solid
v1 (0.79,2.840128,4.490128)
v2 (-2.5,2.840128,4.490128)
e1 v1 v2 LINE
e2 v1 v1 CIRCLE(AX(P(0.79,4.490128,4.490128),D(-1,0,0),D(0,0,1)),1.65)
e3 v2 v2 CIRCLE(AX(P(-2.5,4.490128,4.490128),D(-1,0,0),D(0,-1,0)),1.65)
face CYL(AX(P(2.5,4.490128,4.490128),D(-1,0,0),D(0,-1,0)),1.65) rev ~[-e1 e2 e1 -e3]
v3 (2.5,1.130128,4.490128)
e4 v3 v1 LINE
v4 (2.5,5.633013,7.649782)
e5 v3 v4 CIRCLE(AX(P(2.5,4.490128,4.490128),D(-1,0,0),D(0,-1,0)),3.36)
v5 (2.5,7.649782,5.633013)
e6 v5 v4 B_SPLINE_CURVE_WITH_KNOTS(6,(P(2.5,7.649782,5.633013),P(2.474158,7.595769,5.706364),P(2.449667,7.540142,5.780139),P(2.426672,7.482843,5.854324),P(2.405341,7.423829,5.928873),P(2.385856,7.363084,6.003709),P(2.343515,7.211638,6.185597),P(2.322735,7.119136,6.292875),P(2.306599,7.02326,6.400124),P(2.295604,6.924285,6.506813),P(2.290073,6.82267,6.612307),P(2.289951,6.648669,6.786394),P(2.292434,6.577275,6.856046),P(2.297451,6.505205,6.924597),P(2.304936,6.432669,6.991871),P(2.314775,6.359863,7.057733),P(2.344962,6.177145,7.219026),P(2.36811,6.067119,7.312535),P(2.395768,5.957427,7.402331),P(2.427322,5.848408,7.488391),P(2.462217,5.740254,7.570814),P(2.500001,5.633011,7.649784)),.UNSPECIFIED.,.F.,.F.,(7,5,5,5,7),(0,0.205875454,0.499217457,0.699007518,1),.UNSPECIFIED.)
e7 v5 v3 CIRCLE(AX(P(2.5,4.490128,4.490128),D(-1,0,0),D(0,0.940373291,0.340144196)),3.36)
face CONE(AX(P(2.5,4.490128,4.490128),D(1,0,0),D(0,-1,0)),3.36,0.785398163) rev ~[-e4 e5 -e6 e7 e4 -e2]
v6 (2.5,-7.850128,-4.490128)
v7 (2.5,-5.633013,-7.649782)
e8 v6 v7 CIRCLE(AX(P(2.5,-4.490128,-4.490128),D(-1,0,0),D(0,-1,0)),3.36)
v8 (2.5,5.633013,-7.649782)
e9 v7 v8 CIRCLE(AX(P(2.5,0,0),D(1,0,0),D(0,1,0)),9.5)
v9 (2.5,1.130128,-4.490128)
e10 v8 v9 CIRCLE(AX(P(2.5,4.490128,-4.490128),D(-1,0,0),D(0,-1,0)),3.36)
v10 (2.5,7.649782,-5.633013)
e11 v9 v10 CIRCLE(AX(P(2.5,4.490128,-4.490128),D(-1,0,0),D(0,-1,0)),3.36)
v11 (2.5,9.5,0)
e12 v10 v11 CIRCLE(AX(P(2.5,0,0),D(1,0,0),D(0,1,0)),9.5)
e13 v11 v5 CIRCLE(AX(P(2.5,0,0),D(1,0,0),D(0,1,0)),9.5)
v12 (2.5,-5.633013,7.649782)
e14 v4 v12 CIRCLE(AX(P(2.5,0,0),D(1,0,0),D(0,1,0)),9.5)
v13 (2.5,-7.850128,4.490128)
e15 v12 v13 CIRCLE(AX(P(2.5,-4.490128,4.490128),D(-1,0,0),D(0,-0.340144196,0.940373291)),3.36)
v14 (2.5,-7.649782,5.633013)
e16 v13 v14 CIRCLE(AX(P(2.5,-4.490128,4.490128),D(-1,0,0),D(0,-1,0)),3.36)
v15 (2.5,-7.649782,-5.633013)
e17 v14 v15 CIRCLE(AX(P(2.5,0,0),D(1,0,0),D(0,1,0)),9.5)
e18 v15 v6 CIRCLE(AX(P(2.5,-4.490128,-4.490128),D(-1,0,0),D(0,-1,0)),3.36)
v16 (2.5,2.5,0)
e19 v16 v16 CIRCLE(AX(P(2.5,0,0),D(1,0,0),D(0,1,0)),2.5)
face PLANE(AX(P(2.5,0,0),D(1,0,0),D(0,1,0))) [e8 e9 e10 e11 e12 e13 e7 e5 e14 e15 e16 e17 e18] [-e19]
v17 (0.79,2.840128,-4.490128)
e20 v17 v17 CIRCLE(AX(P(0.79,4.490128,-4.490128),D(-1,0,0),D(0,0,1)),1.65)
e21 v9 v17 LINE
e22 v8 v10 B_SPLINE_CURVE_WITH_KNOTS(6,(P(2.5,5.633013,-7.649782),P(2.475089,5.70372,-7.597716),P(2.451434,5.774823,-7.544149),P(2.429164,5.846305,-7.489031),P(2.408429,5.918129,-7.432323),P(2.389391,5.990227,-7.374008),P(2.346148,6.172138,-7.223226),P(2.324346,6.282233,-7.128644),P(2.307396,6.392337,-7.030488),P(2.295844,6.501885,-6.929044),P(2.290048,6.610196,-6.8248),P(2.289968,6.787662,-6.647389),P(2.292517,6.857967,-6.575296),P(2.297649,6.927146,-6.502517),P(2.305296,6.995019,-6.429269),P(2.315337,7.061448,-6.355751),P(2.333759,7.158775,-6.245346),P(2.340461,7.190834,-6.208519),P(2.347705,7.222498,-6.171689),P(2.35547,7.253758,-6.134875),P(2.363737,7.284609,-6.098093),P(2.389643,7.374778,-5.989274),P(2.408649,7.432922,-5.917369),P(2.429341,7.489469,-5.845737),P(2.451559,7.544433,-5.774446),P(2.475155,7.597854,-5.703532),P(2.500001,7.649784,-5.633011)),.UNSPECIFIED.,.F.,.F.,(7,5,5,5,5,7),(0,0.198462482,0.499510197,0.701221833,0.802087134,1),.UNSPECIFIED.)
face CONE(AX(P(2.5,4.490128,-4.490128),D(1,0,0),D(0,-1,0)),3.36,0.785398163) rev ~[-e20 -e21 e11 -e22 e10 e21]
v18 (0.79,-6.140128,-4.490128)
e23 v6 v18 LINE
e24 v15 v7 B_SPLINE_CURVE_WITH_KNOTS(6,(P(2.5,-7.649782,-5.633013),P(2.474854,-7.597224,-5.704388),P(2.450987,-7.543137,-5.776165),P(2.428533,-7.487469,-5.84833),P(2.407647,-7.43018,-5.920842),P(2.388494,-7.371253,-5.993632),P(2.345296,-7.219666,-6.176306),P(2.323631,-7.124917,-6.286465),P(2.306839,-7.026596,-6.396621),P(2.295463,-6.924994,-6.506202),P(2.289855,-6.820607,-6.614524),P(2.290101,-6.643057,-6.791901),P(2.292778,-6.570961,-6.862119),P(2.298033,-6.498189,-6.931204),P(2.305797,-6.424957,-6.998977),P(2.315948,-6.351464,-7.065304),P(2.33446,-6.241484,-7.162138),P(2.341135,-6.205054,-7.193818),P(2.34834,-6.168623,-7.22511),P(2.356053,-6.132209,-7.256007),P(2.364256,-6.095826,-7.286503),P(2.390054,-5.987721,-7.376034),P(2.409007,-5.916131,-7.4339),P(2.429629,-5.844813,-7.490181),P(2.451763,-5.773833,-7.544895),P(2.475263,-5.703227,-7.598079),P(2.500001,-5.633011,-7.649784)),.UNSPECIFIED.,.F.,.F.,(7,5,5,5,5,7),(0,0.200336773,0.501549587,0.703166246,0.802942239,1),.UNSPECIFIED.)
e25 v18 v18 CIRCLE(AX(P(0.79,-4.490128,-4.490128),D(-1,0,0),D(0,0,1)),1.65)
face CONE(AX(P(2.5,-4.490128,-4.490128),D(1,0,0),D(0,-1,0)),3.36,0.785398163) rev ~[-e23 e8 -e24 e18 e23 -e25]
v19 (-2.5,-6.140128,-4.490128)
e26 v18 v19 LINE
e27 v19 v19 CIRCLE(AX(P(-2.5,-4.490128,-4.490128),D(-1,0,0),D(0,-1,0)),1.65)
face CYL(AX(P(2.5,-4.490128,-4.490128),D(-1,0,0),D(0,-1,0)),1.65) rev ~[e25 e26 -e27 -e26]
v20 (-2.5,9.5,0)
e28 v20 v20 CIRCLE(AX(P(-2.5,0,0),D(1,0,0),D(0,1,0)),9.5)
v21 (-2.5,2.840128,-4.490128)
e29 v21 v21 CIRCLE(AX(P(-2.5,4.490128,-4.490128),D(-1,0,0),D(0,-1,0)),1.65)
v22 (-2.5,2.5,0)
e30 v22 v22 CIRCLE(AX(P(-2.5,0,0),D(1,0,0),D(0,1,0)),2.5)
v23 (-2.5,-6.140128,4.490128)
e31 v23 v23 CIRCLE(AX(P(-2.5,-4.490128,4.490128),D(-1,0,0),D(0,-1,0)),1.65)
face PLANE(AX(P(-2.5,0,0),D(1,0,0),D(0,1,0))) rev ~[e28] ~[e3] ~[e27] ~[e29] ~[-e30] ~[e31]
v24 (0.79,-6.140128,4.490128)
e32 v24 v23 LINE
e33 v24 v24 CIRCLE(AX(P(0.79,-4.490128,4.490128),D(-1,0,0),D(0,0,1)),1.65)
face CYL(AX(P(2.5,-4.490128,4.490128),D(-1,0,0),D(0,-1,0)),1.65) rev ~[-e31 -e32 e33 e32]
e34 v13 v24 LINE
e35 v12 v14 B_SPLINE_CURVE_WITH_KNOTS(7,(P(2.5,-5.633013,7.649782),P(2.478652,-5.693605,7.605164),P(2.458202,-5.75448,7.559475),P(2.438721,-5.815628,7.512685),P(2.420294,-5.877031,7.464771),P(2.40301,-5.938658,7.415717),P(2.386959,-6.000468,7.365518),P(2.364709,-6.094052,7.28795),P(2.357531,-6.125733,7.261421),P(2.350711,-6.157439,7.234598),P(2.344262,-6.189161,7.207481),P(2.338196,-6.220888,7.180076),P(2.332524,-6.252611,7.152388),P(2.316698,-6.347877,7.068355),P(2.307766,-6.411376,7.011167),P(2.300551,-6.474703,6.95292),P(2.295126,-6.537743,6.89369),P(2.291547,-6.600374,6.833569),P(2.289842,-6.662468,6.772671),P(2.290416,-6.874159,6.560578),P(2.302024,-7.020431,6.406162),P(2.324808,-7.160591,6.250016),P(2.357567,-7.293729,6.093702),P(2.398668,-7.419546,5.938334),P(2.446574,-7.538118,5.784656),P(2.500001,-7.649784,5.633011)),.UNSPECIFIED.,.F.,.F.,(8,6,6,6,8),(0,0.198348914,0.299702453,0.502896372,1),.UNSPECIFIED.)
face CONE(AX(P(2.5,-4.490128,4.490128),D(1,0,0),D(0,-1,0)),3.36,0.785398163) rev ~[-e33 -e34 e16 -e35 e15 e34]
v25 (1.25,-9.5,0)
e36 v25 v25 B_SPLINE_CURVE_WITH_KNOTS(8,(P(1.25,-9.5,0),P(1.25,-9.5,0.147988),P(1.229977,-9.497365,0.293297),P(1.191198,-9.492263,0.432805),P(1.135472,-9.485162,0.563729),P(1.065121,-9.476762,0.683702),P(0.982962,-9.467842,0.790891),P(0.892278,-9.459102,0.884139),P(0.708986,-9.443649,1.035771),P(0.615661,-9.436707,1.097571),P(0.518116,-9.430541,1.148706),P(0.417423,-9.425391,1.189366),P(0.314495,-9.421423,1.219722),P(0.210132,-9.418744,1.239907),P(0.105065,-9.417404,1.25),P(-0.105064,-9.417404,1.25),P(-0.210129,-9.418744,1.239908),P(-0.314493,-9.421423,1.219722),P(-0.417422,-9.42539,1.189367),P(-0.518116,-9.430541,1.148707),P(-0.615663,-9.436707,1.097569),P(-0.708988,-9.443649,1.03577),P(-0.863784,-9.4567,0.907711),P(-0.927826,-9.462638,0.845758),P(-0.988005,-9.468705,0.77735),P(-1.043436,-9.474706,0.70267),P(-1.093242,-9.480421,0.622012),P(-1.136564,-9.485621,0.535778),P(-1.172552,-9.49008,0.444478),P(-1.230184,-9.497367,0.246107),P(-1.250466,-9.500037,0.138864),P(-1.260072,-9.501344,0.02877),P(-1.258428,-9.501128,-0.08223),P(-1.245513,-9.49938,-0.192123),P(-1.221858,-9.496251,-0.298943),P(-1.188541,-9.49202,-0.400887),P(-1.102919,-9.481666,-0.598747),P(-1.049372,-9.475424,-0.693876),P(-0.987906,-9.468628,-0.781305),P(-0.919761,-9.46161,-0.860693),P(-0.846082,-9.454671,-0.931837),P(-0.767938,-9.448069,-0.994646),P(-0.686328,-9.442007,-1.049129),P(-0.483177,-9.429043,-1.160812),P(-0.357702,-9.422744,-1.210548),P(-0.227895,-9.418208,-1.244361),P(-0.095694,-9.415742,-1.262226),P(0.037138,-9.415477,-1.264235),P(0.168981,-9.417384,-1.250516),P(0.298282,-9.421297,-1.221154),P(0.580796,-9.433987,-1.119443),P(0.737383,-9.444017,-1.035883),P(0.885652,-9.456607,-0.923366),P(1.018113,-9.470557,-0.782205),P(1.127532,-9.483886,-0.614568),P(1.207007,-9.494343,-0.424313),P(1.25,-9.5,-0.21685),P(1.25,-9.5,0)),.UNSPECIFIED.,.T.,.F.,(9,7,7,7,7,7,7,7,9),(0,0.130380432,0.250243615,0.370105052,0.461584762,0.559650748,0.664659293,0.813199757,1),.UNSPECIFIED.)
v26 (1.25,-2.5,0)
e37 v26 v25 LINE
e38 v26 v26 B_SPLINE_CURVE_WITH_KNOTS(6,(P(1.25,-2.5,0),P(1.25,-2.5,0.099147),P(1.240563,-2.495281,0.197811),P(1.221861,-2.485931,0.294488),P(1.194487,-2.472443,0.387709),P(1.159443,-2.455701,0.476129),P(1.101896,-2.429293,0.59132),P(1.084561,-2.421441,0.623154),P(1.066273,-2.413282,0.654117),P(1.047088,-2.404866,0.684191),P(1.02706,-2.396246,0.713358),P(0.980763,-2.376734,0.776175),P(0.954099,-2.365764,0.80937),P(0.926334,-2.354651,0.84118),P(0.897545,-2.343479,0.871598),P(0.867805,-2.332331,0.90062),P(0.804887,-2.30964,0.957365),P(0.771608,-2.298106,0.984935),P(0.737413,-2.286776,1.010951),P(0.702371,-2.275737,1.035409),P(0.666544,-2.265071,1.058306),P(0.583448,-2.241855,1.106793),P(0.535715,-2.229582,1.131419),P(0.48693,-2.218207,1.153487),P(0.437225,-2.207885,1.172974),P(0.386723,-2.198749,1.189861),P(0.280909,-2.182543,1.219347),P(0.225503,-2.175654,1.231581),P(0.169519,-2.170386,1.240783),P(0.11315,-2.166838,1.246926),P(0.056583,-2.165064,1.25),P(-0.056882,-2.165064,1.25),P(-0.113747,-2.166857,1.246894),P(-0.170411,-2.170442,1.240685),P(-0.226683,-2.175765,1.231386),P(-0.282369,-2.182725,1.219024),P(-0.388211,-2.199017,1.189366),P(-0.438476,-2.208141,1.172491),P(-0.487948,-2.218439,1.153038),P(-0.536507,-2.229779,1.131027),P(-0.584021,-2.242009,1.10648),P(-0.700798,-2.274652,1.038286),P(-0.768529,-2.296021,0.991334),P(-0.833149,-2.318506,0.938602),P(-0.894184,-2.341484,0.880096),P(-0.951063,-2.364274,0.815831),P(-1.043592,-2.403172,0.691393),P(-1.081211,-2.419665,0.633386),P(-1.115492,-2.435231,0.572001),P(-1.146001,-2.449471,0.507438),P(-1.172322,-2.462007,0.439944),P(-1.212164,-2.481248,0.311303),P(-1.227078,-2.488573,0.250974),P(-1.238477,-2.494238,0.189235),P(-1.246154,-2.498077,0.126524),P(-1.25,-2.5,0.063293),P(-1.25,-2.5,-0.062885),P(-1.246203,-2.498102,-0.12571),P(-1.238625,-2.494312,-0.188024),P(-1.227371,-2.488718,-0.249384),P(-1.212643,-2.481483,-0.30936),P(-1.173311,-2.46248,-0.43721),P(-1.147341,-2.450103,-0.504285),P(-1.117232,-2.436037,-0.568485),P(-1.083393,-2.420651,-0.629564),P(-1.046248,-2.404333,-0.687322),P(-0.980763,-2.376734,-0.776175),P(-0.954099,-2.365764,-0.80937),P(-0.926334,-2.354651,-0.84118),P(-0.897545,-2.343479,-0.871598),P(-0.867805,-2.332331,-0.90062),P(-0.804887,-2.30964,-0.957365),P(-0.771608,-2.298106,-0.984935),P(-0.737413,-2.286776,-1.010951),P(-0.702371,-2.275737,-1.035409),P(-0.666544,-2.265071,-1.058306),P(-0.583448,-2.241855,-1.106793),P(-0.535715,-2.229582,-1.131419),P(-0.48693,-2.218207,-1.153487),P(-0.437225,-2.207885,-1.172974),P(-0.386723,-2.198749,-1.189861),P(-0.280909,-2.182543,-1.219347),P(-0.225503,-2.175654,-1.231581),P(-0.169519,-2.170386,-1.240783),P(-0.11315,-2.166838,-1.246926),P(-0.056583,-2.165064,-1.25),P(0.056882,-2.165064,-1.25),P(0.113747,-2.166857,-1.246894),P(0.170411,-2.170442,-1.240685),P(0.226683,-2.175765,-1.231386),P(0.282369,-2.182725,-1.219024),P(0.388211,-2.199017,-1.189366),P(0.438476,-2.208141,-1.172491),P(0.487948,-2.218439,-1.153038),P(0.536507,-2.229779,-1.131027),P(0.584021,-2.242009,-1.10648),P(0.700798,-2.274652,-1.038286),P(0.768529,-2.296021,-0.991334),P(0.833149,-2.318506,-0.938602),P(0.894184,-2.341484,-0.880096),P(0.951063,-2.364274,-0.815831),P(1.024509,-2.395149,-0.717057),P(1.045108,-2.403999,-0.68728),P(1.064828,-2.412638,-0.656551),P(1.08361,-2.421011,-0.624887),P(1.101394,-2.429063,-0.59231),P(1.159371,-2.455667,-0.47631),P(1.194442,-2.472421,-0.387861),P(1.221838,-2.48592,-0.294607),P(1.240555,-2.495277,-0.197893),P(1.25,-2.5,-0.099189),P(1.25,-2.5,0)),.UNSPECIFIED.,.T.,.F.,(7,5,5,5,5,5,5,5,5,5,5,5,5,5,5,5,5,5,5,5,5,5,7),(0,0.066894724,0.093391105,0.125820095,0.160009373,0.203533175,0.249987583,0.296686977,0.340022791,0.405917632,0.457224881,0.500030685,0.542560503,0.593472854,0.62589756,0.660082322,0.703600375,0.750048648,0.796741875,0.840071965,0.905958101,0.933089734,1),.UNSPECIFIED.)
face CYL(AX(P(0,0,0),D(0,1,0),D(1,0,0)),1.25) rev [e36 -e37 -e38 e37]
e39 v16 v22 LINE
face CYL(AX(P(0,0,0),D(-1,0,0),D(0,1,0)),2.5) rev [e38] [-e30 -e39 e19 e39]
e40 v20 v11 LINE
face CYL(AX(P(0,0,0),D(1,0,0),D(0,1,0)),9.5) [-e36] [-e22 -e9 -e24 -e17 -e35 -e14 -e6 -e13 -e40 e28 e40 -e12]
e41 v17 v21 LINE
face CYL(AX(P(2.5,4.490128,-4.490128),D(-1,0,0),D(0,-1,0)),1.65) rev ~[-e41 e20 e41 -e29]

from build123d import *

# Parameters (mm, degrees)
F0_R           = 9.5
F0_R_2         = 2.5
F1_DEPTH       = 2.5
F3_R           = 1.25
F4_DEPTH       = 9.501
F5_D           = 3.3
F5_CSINK_D     = 6.72
F5_CSINK_ANGLE = 90


with BuildPart() as f1:
    # F0 (on Right) → F1 (new body, symmetric)
    with BuildSketch(Plane.YZ):
        Circle(F0_R)
        Circle(F0_R_2, mode=Mode.SUBTRACT)
    extrude(amount=F1_DEPTH, both=True)

    # F3 (on Front) → F4 (cut, through all)
    with BuildSketch(Plane.XZ):
        Circle(F3_R)
    extrude(amount=F4_DEPTH, mode=Mode.SUBTRACT)

    # F5 (through all)
    with Locations(Plane.YZ.offset(2.5)):
        with Locations((-4.4901280605, 4.4901280605), (4.4901280605, 4.4901280605), (4.4901280605, -4.4901280605), (-4.4901280605, -4.4901280605)):
            CounterSinkHole(F5_D / 2, F5_CSINK_D / 2, counter_sink_angle=F5_CSINK_ANGLE)


solid = f1.part
